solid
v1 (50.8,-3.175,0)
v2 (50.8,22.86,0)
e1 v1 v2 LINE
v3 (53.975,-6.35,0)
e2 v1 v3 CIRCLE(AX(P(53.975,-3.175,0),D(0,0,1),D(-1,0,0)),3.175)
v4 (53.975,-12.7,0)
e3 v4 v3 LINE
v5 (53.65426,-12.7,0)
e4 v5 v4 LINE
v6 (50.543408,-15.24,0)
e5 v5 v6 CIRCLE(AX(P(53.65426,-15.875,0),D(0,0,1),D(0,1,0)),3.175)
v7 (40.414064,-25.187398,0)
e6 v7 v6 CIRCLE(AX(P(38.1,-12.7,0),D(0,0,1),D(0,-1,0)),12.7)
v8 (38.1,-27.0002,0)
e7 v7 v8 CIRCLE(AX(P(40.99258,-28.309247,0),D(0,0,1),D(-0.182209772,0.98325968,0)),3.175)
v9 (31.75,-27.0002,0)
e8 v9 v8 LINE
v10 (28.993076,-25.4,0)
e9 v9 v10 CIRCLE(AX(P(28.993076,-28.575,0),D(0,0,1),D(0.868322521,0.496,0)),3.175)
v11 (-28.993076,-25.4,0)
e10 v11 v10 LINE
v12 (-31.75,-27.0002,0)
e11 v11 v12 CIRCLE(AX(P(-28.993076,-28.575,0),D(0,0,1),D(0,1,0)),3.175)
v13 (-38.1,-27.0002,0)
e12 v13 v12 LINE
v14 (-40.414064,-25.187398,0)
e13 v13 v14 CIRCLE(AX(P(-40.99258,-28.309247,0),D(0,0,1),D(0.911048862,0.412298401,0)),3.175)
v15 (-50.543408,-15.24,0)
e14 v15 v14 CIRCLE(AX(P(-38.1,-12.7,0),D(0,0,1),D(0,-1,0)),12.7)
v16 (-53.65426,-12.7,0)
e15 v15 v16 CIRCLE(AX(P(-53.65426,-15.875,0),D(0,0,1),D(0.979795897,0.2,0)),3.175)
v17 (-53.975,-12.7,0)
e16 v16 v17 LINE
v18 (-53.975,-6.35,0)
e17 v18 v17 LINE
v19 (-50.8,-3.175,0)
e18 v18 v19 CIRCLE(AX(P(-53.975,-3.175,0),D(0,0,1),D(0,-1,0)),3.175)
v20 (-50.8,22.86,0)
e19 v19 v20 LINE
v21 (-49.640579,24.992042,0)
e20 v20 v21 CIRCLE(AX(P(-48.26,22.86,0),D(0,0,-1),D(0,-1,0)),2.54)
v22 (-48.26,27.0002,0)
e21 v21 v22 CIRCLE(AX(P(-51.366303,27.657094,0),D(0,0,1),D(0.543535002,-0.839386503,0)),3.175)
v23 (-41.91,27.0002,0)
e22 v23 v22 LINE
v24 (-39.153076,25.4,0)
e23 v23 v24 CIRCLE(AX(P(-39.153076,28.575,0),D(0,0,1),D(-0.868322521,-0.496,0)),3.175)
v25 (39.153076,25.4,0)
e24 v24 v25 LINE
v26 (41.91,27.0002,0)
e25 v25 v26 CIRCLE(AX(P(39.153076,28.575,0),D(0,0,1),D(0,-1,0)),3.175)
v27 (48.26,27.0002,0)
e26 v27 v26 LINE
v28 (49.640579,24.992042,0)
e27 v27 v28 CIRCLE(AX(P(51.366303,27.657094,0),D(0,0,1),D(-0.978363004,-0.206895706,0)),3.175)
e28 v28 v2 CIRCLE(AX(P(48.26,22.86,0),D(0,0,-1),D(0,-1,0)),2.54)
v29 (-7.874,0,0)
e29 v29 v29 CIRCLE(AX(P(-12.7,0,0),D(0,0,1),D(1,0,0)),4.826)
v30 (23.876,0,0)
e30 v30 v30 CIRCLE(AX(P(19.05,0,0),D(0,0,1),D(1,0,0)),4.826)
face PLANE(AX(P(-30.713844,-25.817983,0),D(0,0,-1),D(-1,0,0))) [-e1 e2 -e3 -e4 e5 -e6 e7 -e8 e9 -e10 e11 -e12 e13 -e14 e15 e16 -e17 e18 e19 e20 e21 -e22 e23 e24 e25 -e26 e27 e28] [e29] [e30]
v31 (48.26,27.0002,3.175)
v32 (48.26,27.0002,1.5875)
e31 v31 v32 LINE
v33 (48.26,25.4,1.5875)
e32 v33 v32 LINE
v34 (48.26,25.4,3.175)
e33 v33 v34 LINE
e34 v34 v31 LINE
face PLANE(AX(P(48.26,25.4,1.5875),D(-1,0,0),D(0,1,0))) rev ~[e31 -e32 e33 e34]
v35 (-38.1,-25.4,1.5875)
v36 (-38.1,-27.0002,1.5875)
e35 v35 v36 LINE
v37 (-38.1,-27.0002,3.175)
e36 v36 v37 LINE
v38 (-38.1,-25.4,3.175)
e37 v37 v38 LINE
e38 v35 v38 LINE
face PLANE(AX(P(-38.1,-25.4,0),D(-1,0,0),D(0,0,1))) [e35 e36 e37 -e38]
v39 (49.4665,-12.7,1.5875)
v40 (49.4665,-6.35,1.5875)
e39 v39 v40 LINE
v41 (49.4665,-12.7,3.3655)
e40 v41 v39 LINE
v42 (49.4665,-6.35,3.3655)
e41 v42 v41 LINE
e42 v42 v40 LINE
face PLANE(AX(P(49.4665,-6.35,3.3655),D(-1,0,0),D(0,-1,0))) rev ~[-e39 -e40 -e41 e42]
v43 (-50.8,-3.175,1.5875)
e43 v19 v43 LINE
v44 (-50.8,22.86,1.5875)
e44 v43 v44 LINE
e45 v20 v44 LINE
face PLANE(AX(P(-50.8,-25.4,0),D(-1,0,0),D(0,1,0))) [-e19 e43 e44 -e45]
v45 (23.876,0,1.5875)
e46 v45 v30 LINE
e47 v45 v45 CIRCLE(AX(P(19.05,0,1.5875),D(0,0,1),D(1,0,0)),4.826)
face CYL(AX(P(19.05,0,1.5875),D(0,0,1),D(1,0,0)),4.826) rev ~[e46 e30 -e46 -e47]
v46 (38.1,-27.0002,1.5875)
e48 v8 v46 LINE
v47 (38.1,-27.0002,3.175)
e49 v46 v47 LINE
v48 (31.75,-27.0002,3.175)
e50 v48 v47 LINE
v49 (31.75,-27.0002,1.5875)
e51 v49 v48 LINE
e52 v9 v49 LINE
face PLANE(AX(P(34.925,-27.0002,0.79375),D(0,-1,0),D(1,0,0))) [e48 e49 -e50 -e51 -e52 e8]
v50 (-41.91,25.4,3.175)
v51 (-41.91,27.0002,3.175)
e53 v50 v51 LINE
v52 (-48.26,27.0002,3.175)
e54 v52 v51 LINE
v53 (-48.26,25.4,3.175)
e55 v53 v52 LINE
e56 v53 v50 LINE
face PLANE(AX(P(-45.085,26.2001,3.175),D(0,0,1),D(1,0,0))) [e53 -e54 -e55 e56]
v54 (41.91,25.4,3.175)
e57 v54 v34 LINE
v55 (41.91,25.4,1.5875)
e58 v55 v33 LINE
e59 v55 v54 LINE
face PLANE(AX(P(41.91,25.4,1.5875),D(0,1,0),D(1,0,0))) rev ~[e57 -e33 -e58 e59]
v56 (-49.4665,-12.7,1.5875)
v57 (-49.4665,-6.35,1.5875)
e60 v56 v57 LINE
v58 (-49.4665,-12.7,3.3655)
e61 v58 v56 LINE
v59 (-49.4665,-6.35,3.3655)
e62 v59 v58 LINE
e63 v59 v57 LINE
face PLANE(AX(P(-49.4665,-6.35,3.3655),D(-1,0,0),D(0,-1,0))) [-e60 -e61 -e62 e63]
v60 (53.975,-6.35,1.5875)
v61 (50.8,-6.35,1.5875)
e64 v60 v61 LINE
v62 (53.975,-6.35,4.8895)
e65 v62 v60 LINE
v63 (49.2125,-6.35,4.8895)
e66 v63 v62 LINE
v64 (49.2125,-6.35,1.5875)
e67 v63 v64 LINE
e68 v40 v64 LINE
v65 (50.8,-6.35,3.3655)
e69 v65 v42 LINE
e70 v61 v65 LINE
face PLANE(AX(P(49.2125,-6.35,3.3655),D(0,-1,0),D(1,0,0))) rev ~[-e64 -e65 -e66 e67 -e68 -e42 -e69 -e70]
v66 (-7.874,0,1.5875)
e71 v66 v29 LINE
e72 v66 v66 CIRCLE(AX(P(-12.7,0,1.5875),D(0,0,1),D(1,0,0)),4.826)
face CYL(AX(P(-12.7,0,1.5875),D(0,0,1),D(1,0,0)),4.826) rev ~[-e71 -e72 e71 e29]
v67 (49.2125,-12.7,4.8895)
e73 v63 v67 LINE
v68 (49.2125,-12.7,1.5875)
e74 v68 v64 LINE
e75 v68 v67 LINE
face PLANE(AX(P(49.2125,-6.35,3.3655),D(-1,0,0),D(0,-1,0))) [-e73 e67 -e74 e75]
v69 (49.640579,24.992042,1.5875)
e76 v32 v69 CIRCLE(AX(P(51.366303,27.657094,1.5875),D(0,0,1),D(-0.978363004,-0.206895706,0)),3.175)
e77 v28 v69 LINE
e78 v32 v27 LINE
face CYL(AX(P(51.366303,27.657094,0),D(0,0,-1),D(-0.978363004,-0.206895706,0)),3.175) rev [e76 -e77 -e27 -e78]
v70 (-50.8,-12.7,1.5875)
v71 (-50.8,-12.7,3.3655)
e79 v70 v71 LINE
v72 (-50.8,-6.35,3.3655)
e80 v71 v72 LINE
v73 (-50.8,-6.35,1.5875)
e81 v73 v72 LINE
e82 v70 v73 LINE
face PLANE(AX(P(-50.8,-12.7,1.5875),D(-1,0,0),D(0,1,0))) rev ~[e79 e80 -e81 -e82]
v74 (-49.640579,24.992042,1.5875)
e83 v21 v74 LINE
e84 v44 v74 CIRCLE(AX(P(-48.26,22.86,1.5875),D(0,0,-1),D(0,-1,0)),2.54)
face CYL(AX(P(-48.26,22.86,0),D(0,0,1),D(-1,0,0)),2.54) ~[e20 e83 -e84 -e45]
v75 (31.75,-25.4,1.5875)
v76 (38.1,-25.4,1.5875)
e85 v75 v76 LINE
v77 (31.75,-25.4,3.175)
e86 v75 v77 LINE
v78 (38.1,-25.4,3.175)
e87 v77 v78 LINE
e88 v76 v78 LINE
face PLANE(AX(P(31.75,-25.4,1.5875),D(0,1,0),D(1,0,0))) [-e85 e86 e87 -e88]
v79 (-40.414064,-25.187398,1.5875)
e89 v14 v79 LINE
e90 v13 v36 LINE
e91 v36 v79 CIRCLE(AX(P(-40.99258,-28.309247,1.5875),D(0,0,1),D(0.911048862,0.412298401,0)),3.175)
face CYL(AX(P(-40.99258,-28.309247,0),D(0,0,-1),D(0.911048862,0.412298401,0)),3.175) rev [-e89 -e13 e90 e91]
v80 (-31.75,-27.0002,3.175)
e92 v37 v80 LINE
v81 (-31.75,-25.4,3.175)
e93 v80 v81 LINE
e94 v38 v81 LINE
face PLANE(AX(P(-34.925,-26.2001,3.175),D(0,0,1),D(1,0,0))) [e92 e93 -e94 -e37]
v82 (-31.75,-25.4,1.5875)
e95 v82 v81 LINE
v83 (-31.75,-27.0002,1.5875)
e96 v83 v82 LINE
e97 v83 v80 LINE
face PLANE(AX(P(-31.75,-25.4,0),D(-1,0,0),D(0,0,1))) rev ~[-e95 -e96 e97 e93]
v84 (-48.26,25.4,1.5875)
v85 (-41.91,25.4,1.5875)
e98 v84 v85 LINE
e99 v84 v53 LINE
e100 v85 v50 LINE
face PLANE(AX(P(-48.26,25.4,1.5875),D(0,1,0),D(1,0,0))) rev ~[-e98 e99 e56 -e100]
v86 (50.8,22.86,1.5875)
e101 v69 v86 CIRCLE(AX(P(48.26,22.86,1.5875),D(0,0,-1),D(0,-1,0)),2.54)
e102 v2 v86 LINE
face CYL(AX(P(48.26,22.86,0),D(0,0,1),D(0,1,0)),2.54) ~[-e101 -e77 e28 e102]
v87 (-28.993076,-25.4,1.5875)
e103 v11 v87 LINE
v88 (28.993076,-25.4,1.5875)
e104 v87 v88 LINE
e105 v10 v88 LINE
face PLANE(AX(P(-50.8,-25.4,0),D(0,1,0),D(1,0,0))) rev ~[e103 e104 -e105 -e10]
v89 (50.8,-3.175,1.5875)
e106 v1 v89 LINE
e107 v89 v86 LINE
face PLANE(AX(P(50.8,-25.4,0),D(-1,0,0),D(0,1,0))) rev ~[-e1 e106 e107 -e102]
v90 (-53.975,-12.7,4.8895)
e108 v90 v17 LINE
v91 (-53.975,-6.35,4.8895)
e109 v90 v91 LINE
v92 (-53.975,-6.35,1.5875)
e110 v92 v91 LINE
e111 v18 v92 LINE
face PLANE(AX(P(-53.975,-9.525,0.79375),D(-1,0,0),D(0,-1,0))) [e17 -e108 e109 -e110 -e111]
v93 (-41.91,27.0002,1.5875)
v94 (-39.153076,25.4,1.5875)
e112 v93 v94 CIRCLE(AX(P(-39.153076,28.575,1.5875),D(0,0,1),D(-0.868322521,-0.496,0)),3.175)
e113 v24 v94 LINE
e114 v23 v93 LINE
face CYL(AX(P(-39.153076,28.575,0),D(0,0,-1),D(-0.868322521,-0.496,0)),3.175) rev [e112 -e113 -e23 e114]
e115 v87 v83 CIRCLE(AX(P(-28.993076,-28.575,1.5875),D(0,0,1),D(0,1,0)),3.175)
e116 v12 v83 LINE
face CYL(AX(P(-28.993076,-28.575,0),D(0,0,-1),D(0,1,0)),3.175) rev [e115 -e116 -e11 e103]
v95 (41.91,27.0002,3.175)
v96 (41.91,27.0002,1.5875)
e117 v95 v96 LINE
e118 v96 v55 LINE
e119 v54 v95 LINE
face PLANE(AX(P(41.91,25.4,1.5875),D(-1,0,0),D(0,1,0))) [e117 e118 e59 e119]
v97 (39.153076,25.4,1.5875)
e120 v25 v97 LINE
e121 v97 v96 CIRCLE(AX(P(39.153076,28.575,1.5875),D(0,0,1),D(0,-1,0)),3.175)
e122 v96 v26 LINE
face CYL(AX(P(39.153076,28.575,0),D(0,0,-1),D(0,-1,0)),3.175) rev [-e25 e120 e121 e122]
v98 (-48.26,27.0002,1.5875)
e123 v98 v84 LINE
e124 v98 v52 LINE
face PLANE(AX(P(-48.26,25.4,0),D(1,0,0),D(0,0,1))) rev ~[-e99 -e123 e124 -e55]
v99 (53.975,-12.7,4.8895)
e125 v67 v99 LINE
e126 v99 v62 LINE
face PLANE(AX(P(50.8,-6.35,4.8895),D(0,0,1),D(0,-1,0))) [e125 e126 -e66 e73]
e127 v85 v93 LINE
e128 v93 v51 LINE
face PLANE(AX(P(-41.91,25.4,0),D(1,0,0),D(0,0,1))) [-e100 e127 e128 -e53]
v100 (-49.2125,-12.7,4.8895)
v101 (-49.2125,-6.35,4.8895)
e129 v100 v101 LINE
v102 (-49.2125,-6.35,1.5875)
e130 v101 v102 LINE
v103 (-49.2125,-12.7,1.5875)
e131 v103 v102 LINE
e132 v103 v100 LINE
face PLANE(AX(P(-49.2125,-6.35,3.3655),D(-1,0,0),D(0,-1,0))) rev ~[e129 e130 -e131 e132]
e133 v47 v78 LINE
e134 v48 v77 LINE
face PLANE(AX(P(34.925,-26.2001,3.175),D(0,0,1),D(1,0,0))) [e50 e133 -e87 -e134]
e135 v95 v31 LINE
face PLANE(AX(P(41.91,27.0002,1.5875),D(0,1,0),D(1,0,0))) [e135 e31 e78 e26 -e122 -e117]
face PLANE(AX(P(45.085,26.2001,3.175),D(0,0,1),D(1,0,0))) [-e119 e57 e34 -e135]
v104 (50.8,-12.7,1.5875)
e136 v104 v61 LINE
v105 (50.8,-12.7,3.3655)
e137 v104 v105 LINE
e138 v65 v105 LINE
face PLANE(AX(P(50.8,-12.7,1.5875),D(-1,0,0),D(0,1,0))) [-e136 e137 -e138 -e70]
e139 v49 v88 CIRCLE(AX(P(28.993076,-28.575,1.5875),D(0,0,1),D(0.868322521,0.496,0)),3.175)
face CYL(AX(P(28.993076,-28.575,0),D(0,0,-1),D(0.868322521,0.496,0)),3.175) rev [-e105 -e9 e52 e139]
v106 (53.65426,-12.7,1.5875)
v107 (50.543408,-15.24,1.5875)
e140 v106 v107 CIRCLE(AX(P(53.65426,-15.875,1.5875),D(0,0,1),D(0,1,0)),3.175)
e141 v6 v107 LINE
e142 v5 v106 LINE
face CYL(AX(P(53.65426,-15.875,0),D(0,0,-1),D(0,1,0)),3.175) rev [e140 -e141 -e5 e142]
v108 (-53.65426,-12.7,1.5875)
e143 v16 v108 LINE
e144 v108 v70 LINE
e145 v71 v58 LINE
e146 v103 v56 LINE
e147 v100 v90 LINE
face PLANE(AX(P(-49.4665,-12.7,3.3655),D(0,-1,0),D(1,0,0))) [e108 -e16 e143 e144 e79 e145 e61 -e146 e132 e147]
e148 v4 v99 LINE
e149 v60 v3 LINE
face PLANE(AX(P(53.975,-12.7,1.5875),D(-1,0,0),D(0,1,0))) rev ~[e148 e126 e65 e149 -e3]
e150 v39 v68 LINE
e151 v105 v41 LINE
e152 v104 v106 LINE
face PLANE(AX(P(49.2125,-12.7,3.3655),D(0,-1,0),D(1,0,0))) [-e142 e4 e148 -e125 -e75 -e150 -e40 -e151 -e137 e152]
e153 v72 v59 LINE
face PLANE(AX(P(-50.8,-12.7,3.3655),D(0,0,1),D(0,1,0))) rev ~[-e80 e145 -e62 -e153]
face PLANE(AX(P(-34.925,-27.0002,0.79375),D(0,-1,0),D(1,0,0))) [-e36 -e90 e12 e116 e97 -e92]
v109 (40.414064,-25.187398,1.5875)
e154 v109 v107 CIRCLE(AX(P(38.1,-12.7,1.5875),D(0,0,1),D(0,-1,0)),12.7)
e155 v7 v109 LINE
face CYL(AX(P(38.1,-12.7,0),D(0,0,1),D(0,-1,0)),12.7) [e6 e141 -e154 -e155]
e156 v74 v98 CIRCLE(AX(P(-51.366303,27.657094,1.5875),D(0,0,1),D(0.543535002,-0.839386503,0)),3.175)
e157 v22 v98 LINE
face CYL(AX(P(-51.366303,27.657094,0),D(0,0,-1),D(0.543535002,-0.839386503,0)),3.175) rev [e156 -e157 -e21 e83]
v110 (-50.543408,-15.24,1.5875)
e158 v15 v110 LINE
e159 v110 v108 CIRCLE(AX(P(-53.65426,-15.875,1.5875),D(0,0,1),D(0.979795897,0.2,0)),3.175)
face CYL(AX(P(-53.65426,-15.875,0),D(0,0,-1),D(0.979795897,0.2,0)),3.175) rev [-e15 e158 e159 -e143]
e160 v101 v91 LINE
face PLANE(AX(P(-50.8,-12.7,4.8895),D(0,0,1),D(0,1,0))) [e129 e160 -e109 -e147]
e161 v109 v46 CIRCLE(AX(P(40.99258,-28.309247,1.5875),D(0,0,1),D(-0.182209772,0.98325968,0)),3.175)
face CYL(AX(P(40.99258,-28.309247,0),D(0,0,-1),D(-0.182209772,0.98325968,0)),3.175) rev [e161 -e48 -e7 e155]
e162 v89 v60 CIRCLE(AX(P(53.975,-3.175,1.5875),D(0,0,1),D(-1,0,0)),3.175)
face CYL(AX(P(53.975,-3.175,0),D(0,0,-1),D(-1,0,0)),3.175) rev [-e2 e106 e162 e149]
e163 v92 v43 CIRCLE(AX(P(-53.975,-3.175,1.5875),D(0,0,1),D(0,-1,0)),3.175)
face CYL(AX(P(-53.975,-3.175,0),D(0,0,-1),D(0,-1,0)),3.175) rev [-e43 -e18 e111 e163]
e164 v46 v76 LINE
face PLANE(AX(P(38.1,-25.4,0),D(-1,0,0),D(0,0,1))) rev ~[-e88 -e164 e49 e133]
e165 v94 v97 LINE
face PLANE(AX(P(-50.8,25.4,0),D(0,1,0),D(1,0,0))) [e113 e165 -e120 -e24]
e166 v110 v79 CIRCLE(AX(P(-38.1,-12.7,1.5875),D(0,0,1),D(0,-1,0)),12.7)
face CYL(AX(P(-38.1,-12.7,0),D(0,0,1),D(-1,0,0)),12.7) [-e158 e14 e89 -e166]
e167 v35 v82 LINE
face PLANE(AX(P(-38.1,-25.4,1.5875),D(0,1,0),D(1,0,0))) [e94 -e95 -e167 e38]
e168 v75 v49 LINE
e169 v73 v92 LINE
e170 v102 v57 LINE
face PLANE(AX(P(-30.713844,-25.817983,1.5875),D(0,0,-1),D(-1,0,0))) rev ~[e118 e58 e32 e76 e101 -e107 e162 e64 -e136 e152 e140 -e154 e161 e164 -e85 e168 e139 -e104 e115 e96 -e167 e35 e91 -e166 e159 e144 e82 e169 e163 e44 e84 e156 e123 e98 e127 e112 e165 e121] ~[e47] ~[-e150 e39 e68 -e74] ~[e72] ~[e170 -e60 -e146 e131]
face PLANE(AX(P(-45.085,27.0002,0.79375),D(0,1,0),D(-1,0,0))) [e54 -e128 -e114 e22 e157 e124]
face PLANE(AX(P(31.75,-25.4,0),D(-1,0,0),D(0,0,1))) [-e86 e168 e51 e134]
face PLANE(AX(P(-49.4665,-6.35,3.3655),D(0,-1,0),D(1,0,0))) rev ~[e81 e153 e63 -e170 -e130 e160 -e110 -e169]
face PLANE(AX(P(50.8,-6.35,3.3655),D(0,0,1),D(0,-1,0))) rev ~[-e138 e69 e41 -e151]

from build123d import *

# Parameters (mm, degrees)
F0_W         = 101.6
F0_H         = 50.8
F0_R         = 1.905
F1_DEPTH     = 1.5875
F3_R         = 12.7
F4_R         = 2.54
F2_R         = 4.826
F2_R_2       = 1.905
F5_DEPTH     = 3.175
F6_W         = 6.35
F6_H         = 1.5875
F7_DEPTH     = 1.6002
F8_W         = 6.35
F8_H         = 1.5875
F9_DEPTH     = 1.6002
F10_W        = 6.35
F10_H        = 1.5875
F11_DEPTH    = 3.175
F12_W        = 6.35
F12_H        = 1.5875
F13_DEPTH    = 3.175
F14_W        = 6.35
F14_H        = 1.6002
F15_DEPTH    = 1.5875
F14_W_2      = 3.175
F14_H_2      = 6.35
F16_DEPTH    = 3.302
F17_W        = 6.35
F17_H        = 1.524
F18_DEPTH    = 1.5875
F19_W        = 6.35
F19_H        = 1.524
F20_DEPTH    = 1.5875
F21_T1_DEPTH = 1.5875
F22_W        = 0.254
F22_H        = 6.35
F23_DEPTH    = 2.032
F24_W        = 0.254
F24_H        = 6.35
F25_DEPTH    = 2.032


# Not quite as in the source:
# - a fillet or chamfer that OpenCascade refuses, or shapes differently, is made with other operations: its cross-section is extruded or revolved along the edge and cut away or added


with BuildPart() as f1:
    # F0 (on Top) → F1 (new body)
    with BuildSketch(Plane.XY):
        Rectangle(F0_W, F0_H)
        with Locations((-12.7, 0)):
            Circle(F0_R, mode=Mode.SUBTRACT)
        with Locations((19.05, 0)):
            Circle(F0_R, mode=Mode.SUBTRACT)
    extrude(amount=F1_DEPTH)

    # F3
    f3_edges = [f1.edges().sort_by_distance(p)[0] for p in [
        (-50.8, -25.4, 0.79375),
        (50.8, -25.4, 0.79375),
    ]]
    fillet(f3_edges, radius=F3_R)

    # F4
    f4_edges = [f1.edges().sort_by_distance(p)[0] for p in [
        (-50.8, 25.4, 0.79375),
        (50.8, 25.4, 0.79375),
    ]]
    fillet(f4_edges, radius=F4_R)

    # F2 (on face) → F5 (cut)
    with BuildSketch(Plane.XY.offset(1.5875)):
        with Locations((-12.7, 0)):
            Circle(F2_R)
        with Locations((-12.7, 0)):
            Circle(F2_R_2, mode=Mode.SUBTRACT)
        with Locations((19.05, 0)):
            Circle(F2_R)
        with Locations((19.05, 0)):
            Circle(F2_R_2, mode=Mode.SUBTRACT)
    extrude(amount=-F5_DEPTH, mode=Mode.SUBTRACT)

    # F6 (on face) → F7 (join)
    with BuildSketch(Plane(origin=(0, 25.4, 0), x_dir=(-1, 0, 0), z_dir=(0, 1, 0))):
        with Locations((-45.085, 0.79375)):
            Rectangle(F6_W, F6_H)
        with Locations((45.085, 0.79375)):
            Rectangle(F6_W, F6_H)
    extrude(amount=F7_DEPTH)

    # F8 (on face) → F9 (join)
    with BuildSketch(Plane.XZ.offset(25.4)):
        with Locations((34.925, 0.79375)):
            Rectangle(F8_W, F8_H)
        with Locations((-34.925, 0.79375)):
            Rectangle(F8_W, F8_H)
    extrude(amount=F9_DEPTH)

    # F10 (on face) → F11 (join)
    with BuildSketch(Plane(origin=(-50.8, 0, 0), x_dir=(0, -1, 0), z_dir=(-1, 0, 0))):
        with Locations((9.525, 0.79375)):
            Rectangle(F10_W, F10_H)
    extrude(amount=F11_DEPTH)

    # F12 (on face) → F13 (join)
    with BuildSketch(Plane.YZ.offset(50.8)):
        with Locations((-9.525, 0.79375)):
            Rectangle(F12_W, F12_H)
    extrude(amount=F13_DEPTH)

    # F14 (on face) → F15 (join)
    with BuildSketch(Plane.XY.offset(1.5875)):
        with Locations((45.085, 26.2001)):
            Rectangle(F14_W, F14_H)
        with Locations((34.925, -26.2001)):
            Rectangle(F14_W, F14_H)
        with Locations((-34.925, -26.2001)):
            Rectangle(F14_W, F14_H)
        with Locations((-45.085, 26.2001)):
            Rectangle(F14_W, F14_H)
    extrude(amount=F15_DEPTH)

    # F14 (on face) → F16 (join)
    with BuildSketch(Plane.XY.offset(1.5875)):
        with Locations((52.3875, -9.525)):
            Rectangle(F14_W_2, F14_H_2)
        with Locations((-52.3875, -9.525)):
            Rectangle(F14_W_2, F14_H_2)
    extrude(amount=F16_DEPTH)

    # F17 (on face) → F18 (join)
    with BuildSketch(Plane.YZ.offset(-50.8)):
        with Locations((-9.525, 4.1275)):
            Rectangle(F17_W, F17_H)
    extrude(amount=F18_DEPTH)

    # F19 (on face) → F20 (join)
    with BuildSketch(Plane(origin=(50.8, 0, 0), x_dir=(0, -1, 0), z_dir=(-1, 0, 0))):
        with Locations((9.525, 4.1275)):
            Rectangle(F19_W, F19_H)
    extrude(amount=F20_DEPTH)

    # F21: fillet of radius 3.175 on 12 edges, made by hand

    # F21_s2 → F21_t1 (join)
    with BuildSketch(Plane.XY):
        with BuildLine():
            ThreePointArc((-28.9930759967, -25.4), (-30.5869133472, -25.8290379646), (-31.75, -27.0002))
            Line((-31.75, -27.0002), (-31.75, -25.4))
            Line((-31.75, -25.4), (-28.9930759967, -25.4))
        make_face()
        with BuildLine():
            ThreePointArc((-38.1, -27.0002), (-39.0345990401, -25.8098604937), (-40.4140641084, -25.1873979396))
            ThreePointArc((-40.4140641084, -25.1873979396), (-39.2619049374, -25.3467377974), (-38.1, -25.4))
            Line((-38.1, -25.4), (-38.1, -27.0002))
        make_face()
        with BuildLine():
            ThreePointArc((-50.5434078933, -15.24), (-51.6462135525, -13.4156555752), (-53.6542598667, -12.7))
            Line((-53.6542598667, -12.7), (-50.8, -12.7))
            ThreePointArc((-50.8, -12.7), (-50.7356891432, -13.9764638175), (-50.5434078933, -15.24))
        make_face()
        with BuildLine():
            ThreePointArc((-53.975, -6.35), (-51.7299359697, -5.4200640303), (-50.8, -3.175))
            Line((-50.8, -3.175), (-50.8, -6.35))
            Line((-50.8, -6.35), (-53.975, -6.35))
        make_face()
        with BuildLine():
            ThreePointArc((-49.6405789052, 24.9920417178), (-48.7499512331, 25.8583913172), (-48.26, 27.0002))
            Line((-48.26, 27.0002), (-48.26, 25.4))
            ThreePointArc((-48.26, 25.4), (-48.9797965118, 25.2958762246), (-49.6405789052, 24.9920417178))
        make_face()
        with BuildLine():
            ThreePointArc((-41.91, 27.0002), (-40.7469133472, 25.8290379646), (-39.1530759967, 25.4))
            Line((-39.1530759967, 25.4), (-41.91, 25.4))
            Line((-41.91, 25.4), (-41.91, 27.0002))
        make_face()
        with BuildLine():
            ThreePointArc((48.26, 27.0002), (48.7499512331, 25.8583913172), (49.6405789052, 24.9920417178))
            ThreePointArc((49.6405789052, 24.9920417178), (48.9797965118, 25.2958762246), (48.26, 25.4))
            Line((48.26, 25.4), (48.26, 27.0002))
        make_face()
        with BuildLine():
            ThreePointArc((39.1530759967, 25.4), (40.7469133472, 25.8290379646), (41.91, 27.0002))
            Line((41.91, 27.0002), (41.91, 25.4))
            Line((41.91, 25.4), (39.1530759967, 25.4))
        make_face()
        with BuildLine():
            ThreePointArc((50.8, -3.175), (51.7299359697, -5.4200640303), (53.975, -6.35))
            Line((53.975, -6.35), (50.8, -6.35))
            Line((50.8, -6.35), (50.8, -3.175))
        make_face()
        with BuildLine():
            ThreePointArc((53.6542598667, -12.7), (51.6462135525, -13.4156555752), (50.5434078933, -15.24))
            ThreePointArc((50.5434078933, -15.24), (50.7356891432, -13.9764638175), (50.8, -12.7))
            Line((50.8, -12.7), (53.6542598667, -12.7))
        make_face()
        with BuildLine():
            ThreePointArc((40.4140641084, -25.1873979396), (39.0345990401, -25.8098604937), (38.1, -27.0002))
            Line((38.1, -27.0002), (38.1, -25.4))
            ThreePointArc((38.1, -25.4), (39.2619049374, -25.3467377974), (40.4140641084, -25.1873979396))
        make_face()
        with BuildLine():
            ThreePointArc((31.75, -27.0002), (30.5869133472, -25.8290379646), (28.9930759967, -25.4))
            Line((28.9930759967, -25.4), (31.75, -25.4))
            Line((31.75, -25.4), (31.75, -27.0002))
        make_face()
    extrude(amount=F21_T1_DEPTH)

    # F22 (on face) → F23 (join)
    with BuildSketch(Plane(origin=(0, 0, 3.3655), x_dir=(1, 0, 0), z_dir=(0, 0, -1))):
        with Locations((49.3395, 9.525)):
            Rectangle(F22_W, F22_H)
    extrude(amount=F23_DEPTH)

    # F24 (on face) → F25 (join)
    with BuildSketch(Plane(origin=(0, 0, 3.3655), x_dir=(1, 0, 0), z_dir=(0, 0, -1))):
        with Locations((-49.3395, 9.525)):
            Rectangle(F24_W, F24_H)
    extrude(amount=F25_DEPTH)


solid = f1.part
